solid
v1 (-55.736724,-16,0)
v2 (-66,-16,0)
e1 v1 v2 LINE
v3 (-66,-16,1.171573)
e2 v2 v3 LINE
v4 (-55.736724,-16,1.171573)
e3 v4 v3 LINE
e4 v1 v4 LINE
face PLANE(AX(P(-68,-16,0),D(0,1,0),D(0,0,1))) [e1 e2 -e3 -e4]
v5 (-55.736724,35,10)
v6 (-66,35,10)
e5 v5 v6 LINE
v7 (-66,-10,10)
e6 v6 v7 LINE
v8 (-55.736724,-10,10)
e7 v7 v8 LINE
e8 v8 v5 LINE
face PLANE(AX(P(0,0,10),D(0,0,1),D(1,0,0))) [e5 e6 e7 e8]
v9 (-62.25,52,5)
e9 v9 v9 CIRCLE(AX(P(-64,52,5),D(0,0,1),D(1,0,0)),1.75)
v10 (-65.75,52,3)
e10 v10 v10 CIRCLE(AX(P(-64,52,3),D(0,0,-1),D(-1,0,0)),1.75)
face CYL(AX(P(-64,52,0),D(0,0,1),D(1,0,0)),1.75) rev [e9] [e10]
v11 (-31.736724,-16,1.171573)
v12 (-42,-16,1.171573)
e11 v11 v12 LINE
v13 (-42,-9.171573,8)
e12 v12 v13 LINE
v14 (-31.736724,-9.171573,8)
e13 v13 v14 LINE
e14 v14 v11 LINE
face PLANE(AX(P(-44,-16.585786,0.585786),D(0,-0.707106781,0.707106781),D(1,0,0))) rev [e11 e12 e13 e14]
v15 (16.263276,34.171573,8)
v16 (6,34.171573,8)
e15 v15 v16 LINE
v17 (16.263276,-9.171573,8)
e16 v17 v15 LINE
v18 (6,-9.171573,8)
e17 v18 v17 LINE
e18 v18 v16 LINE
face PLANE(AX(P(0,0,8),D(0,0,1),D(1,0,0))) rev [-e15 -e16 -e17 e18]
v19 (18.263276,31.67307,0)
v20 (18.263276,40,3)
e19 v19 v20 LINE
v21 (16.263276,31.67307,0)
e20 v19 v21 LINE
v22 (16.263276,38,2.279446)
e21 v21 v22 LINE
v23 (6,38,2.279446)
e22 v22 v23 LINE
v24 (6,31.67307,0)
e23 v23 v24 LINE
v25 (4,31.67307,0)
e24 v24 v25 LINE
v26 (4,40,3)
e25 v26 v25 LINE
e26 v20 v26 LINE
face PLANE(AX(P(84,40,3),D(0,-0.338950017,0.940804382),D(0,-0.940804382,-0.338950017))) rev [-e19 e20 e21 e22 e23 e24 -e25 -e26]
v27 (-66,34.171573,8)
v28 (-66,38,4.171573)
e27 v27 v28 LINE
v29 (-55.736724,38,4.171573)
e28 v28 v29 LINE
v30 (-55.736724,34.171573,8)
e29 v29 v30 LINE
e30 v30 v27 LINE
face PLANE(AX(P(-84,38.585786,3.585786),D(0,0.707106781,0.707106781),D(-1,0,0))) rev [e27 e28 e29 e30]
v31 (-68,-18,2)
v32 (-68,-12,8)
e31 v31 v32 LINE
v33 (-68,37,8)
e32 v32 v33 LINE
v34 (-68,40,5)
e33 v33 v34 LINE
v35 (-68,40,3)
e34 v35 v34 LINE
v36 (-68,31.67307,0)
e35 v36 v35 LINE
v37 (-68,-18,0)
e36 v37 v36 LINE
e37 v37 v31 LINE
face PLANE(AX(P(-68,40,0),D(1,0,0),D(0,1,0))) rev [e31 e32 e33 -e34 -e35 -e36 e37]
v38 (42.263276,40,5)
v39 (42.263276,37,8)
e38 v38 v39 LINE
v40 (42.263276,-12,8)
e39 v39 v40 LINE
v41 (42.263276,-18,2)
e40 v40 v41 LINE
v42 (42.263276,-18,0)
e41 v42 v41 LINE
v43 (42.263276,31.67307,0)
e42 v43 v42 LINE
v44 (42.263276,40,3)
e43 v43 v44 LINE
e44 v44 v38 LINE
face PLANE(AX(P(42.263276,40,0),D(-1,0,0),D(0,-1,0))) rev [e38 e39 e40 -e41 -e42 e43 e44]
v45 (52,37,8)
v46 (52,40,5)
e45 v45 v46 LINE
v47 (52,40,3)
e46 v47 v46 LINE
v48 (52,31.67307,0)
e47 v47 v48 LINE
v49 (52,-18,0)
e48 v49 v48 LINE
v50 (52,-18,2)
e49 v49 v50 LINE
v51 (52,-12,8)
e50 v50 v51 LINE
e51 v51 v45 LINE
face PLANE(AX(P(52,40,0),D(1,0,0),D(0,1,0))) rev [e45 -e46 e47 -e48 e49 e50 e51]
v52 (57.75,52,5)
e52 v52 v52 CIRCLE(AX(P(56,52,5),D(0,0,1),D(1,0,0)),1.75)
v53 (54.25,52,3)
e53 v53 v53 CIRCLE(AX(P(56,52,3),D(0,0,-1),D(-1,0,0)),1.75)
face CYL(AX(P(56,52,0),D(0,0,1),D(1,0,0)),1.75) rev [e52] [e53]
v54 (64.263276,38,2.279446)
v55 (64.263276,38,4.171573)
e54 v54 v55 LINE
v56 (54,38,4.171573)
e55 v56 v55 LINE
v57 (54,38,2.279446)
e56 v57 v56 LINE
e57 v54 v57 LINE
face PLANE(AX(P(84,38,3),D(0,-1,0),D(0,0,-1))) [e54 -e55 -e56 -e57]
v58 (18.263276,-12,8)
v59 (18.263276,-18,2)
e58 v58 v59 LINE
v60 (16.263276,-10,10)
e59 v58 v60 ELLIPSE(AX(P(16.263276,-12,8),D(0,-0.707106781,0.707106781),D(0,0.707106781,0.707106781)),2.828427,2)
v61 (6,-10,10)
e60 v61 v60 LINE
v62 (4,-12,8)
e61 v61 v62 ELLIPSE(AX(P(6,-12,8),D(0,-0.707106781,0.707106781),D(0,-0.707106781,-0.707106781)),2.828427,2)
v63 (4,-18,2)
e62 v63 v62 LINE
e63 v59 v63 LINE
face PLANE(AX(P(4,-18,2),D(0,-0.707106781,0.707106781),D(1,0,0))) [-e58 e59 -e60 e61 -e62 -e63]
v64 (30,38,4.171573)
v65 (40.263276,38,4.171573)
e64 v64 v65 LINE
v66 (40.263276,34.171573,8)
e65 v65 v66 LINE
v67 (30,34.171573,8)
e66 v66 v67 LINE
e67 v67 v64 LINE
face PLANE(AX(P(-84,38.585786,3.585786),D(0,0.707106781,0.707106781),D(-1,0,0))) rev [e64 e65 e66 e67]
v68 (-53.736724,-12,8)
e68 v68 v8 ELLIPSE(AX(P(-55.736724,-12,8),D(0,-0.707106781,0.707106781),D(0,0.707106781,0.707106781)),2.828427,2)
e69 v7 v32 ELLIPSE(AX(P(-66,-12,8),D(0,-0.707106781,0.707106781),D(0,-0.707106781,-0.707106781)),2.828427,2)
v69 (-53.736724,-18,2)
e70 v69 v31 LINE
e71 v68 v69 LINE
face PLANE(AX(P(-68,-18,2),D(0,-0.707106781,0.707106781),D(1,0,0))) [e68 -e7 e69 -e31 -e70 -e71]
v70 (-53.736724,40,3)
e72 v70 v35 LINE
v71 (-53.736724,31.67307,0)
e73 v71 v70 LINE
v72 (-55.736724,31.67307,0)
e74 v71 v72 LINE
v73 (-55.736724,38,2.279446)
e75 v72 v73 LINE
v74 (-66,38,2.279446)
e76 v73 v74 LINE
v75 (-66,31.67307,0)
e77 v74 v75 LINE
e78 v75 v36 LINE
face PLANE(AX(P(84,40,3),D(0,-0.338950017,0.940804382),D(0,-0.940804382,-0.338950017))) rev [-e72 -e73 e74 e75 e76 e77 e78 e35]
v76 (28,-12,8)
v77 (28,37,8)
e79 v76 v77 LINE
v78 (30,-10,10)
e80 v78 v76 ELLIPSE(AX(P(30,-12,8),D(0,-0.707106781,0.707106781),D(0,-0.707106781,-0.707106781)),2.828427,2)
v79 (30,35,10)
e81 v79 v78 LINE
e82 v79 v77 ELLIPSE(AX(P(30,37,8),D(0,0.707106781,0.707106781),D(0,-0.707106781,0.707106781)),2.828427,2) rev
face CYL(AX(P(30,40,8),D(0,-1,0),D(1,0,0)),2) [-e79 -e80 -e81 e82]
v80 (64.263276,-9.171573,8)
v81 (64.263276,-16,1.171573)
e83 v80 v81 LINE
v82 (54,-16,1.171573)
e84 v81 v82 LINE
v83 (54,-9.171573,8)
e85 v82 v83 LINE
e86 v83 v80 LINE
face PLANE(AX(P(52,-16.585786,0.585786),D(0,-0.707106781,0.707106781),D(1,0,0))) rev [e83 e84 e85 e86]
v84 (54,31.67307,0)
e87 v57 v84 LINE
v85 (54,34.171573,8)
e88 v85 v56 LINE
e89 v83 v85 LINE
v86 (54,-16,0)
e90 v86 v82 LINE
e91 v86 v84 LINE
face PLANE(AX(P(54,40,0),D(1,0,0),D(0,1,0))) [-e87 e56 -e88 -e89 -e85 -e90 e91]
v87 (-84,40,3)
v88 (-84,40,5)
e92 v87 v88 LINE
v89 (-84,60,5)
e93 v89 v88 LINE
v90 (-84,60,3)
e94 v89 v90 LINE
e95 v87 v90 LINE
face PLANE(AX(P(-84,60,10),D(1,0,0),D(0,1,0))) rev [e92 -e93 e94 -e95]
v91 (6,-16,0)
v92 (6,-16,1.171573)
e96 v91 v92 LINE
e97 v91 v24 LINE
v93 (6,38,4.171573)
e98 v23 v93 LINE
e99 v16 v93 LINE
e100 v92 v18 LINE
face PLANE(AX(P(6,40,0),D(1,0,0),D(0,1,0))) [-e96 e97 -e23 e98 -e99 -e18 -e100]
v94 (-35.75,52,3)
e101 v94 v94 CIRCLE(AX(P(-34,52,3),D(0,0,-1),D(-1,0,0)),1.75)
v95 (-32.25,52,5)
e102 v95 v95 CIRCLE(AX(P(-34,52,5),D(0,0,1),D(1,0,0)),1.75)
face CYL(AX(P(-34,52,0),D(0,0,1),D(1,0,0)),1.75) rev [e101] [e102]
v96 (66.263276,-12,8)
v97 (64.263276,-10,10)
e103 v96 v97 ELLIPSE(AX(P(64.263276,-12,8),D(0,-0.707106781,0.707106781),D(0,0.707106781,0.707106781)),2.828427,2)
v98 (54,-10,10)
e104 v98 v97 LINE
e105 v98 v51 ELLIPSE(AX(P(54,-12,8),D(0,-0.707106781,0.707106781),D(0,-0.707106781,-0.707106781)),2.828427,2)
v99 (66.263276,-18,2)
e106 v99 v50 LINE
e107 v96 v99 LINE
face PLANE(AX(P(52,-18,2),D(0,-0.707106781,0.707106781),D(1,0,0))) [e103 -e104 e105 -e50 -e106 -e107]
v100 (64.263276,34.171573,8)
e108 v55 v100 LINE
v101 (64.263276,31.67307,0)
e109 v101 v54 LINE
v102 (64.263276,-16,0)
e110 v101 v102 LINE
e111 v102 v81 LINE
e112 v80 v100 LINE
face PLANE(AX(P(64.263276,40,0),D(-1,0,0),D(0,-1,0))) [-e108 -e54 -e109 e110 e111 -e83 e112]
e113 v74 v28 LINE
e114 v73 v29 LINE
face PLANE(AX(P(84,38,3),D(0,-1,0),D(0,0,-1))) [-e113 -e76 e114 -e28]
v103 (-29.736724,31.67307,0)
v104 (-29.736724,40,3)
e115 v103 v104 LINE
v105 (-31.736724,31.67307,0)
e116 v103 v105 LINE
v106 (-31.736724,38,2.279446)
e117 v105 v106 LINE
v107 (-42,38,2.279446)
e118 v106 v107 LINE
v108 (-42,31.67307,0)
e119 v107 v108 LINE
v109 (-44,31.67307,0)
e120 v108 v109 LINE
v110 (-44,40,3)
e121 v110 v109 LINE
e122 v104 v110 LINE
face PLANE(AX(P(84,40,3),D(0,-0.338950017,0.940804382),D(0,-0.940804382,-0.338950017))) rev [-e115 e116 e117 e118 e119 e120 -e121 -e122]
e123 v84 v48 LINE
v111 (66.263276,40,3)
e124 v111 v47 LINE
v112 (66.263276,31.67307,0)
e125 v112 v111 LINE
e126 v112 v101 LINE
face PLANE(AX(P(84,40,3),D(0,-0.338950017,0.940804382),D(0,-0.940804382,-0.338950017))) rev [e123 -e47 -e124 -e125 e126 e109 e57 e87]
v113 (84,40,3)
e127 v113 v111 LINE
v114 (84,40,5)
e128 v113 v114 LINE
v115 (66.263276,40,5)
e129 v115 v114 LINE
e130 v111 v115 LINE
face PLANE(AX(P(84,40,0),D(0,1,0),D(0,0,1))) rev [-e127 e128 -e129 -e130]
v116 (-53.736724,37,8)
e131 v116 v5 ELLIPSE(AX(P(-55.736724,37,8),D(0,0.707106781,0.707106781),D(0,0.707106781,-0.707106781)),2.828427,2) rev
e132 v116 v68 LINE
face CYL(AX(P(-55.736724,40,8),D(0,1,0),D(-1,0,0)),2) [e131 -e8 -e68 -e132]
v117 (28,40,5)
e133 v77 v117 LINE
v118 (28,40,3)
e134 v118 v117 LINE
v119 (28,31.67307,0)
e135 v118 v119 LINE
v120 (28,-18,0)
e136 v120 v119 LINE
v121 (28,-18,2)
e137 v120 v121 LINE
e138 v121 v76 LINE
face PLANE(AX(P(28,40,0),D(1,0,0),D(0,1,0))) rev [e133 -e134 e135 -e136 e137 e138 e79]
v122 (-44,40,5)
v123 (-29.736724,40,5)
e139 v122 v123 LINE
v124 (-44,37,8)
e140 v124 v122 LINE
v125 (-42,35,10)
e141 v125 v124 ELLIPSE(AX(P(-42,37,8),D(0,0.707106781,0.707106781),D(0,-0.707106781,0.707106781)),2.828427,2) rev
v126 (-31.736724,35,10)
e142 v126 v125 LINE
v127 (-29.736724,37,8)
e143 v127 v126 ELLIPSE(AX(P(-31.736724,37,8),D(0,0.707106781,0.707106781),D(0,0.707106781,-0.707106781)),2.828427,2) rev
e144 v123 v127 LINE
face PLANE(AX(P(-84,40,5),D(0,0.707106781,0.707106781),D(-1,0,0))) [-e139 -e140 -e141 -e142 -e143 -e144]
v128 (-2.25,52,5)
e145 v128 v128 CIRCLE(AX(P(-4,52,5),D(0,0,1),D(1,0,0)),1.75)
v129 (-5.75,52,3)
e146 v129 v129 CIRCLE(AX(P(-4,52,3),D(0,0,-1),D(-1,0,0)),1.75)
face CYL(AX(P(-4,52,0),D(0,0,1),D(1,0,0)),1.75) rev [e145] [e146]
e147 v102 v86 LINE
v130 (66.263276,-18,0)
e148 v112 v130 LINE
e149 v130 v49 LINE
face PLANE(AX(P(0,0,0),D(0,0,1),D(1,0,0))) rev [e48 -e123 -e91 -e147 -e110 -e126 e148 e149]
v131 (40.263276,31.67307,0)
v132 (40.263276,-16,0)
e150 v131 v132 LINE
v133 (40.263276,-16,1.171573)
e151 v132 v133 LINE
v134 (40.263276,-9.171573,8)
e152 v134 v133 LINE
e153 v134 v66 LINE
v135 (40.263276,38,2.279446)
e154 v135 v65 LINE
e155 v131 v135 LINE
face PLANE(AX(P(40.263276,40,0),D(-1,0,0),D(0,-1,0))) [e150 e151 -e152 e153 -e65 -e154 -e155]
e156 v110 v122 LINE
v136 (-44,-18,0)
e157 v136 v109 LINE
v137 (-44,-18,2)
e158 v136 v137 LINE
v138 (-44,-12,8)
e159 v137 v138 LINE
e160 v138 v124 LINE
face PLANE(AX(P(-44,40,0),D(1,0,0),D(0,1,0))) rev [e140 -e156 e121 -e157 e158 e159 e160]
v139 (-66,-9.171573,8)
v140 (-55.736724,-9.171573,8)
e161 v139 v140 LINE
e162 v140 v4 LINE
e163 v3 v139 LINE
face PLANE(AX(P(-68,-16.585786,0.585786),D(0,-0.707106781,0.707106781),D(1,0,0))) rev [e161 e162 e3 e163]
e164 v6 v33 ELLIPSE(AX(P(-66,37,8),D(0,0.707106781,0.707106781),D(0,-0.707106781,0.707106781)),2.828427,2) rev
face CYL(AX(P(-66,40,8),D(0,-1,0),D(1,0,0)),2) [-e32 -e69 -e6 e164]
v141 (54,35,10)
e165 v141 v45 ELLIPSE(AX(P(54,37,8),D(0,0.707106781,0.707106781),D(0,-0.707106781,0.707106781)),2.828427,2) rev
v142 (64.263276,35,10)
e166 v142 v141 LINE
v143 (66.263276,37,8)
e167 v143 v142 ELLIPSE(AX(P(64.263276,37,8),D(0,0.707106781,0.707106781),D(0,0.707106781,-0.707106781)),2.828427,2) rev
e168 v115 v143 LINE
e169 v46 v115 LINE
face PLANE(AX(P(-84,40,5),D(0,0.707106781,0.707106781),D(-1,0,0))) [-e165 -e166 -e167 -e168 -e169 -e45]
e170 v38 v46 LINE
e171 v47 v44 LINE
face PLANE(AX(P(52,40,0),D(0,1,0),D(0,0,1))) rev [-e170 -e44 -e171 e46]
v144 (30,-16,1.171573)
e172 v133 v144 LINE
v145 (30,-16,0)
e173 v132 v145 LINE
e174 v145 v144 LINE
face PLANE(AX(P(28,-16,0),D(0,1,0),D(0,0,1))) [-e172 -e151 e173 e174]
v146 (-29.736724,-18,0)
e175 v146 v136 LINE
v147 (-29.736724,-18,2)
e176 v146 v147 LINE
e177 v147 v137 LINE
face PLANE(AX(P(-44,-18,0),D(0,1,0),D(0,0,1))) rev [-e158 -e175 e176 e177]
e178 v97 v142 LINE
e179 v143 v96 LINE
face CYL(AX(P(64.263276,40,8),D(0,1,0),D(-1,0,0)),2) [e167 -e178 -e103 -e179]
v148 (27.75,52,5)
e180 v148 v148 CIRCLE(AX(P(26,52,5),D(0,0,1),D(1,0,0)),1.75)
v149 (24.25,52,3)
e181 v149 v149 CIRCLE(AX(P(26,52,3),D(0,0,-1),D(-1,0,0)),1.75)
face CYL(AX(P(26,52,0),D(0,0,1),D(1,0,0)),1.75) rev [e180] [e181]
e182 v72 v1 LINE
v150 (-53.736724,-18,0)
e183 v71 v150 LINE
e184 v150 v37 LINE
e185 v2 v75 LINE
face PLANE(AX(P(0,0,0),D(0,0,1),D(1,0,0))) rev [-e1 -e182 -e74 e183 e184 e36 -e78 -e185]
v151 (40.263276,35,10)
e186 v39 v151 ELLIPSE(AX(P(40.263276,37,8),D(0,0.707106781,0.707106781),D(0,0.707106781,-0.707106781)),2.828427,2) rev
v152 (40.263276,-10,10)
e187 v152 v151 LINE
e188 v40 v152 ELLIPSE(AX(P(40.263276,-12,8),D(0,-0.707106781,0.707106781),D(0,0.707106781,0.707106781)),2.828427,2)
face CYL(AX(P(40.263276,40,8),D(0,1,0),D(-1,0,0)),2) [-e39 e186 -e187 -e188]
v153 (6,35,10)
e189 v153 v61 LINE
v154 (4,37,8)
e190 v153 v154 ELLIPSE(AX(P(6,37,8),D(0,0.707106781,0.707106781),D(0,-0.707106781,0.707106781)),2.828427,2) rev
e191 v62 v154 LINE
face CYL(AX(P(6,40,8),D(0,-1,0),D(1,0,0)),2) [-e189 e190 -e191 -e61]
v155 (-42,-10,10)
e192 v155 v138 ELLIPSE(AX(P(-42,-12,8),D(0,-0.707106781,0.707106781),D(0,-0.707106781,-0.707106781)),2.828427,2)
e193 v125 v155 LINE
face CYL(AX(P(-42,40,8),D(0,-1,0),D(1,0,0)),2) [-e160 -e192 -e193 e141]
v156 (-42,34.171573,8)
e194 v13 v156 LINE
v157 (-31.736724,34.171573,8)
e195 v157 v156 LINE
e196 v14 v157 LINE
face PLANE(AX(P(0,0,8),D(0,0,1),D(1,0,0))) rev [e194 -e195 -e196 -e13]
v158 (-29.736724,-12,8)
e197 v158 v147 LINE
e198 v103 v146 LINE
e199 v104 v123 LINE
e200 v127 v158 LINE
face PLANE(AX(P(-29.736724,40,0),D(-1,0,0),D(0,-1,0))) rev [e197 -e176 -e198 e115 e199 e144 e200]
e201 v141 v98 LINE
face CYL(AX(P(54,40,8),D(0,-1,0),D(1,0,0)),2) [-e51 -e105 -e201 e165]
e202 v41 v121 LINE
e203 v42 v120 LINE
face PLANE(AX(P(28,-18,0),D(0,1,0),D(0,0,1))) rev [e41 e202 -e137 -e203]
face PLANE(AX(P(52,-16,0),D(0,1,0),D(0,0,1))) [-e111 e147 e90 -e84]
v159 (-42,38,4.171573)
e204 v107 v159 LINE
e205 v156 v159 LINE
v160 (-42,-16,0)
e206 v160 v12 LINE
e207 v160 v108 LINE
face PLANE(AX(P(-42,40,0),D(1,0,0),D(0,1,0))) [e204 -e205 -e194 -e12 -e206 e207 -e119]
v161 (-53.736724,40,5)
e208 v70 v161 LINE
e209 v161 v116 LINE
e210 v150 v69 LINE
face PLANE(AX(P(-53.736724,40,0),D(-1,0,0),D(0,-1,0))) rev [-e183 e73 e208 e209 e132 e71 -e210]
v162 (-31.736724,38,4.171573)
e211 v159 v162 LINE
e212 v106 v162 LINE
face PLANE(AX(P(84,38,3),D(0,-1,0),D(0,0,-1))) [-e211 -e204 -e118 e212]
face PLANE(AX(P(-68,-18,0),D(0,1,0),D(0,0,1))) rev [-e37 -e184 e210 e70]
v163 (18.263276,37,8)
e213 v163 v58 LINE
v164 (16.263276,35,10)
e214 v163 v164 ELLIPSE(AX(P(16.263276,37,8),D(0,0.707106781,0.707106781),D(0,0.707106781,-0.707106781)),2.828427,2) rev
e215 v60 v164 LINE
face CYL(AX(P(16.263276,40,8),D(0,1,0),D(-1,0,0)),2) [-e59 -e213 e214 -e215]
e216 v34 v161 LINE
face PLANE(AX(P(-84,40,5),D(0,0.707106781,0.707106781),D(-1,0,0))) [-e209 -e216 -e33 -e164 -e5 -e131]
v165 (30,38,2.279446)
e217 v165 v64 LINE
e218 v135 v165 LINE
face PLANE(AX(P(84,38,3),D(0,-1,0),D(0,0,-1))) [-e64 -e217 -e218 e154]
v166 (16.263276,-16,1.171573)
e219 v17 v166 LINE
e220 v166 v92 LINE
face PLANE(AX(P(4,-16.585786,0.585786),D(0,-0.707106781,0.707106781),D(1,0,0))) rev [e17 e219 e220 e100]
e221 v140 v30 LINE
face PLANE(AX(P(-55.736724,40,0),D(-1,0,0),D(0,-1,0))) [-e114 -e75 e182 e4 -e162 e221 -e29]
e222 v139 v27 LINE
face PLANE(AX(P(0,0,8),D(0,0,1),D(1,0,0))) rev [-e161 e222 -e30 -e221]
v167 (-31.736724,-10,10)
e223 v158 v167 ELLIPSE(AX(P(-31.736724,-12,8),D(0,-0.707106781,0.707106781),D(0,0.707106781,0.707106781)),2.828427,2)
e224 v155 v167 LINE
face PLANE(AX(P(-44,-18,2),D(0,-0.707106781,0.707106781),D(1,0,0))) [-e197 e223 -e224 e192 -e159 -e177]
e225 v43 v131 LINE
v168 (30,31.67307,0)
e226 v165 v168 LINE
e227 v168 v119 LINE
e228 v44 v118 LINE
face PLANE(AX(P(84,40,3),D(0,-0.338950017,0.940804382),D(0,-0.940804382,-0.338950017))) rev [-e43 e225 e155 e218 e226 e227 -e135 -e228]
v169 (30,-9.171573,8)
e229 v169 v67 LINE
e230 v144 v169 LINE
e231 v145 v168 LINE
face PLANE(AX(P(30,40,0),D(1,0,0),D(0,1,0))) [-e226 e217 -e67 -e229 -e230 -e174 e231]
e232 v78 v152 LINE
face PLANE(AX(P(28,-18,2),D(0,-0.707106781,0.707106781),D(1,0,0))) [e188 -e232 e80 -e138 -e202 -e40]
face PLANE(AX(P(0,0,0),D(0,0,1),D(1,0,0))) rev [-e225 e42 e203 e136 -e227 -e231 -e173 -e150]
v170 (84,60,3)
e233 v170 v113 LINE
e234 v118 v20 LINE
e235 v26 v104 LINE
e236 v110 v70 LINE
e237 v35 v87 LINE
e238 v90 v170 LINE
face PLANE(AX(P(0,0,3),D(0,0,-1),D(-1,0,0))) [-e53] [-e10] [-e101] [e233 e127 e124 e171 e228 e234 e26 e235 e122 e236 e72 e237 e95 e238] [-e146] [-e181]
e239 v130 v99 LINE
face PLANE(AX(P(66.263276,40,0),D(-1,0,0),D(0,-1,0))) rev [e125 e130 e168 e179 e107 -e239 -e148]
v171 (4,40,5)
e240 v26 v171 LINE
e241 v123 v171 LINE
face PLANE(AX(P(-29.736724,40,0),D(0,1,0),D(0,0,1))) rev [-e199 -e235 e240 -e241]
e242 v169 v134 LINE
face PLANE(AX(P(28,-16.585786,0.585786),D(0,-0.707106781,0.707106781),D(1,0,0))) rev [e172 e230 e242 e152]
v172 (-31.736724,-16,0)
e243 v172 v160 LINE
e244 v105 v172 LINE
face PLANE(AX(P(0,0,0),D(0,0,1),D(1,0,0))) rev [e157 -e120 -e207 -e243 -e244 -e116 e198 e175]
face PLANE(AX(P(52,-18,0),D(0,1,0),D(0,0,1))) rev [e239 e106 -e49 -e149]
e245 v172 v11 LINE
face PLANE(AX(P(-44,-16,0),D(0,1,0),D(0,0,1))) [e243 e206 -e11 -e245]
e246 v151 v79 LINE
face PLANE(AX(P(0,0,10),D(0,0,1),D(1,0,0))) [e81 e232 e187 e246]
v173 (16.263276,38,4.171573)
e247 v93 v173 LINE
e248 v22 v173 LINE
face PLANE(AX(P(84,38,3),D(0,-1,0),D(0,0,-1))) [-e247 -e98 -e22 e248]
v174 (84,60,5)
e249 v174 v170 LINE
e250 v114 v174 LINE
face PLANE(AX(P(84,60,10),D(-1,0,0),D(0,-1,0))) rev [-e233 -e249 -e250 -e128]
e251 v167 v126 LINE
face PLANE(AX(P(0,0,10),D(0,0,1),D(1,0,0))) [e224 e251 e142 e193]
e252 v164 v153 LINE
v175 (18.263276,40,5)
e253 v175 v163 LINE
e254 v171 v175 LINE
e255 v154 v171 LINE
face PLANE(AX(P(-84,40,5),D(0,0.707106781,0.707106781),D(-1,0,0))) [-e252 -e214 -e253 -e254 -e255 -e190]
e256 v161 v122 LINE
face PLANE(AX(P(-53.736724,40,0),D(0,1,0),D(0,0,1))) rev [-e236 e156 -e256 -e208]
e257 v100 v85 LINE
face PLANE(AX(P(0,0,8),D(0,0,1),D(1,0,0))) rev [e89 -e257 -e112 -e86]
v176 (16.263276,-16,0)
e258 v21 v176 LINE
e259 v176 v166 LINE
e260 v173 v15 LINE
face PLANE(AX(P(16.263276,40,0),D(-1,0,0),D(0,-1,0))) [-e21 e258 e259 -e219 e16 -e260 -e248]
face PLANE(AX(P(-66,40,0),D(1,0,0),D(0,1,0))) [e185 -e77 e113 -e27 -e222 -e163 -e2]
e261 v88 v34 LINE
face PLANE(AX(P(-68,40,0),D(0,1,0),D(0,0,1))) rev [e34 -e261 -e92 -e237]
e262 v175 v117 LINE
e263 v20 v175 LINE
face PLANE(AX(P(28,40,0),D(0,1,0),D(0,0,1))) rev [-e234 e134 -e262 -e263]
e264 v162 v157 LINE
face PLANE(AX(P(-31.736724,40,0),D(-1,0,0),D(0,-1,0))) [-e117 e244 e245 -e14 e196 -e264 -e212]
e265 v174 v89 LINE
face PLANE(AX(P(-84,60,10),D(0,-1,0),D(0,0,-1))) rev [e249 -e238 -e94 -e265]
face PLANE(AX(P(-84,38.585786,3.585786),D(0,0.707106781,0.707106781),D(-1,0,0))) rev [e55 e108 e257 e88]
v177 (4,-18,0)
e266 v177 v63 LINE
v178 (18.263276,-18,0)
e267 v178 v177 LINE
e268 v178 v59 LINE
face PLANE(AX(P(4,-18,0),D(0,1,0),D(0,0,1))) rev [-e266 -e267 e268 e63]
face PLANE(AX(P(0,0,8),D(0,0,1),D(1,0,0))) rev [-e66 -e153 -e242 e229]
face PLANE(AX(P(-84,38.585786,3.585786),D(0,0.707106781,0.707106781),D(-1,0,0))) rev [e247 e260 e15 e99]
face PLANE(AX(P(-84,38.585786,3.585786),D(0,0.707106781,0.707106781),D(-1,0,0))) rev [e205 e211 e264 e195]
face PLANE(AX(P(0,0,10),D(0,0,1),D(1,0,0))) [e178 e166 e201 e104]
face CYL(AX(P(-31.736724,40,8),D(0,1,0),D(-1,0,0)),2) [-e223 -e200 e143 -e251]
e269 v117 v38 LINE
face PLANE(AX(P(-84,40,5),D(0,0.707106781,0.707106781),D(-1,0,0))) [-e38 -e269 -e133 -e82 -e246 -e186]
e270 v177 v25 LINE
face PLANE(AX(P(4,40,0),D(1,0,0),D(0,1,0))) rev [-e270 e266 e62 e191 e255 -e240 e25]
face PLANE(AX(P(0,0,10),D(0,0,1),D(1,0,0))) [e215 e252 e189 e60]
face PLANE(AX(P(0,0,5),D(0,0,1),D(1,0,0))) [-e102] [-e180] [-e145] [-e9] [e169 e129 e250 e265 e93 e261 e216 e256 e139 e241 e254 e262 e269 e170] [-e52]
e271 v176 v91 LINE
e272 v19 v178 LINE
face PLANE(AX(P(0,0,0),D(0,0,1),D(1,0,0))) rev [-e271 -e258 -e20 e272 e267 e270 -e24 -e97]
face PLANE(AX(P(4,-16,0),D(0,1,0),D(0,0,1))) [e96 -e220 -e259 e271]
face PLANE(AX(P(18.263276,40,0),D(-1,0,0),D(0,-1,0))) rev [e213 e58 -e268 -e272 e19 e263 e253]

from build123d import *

# Parameters (mm, degrees)
SKETCH1_W           = 168
SKETCH1_H           = 120
BOSS_EXTRUDE1_DEPTH = 10
CUT_EXTRUDE1_DEPTH  = 104.7111373
CHAMFER1_SIZE       = 8
FILLET1_R           = 2
SKETCH3_W           = 168
SKETCH3_H           = 20
CUT_EXTRUDE2_DEPTH  = 5
SKETCH4_W           = 168
SKETCH4_H           = 20
CUT_EXTRUDE3_DEPTH  = 3
CHAMFER2_SIZE       = 5
SHELL1_START        = -66
SHELL1_DEPTH        = 10.263276069
SHELL1_START_2      = -42
SHELL1_2_DEPTH      = 10.263276069
SHELL1_START_3      = 6
SHELL1_3_DEPTH      = 10.263276069
SHELL1_START_4      = 30
SHELL1_4_DEPTH      = 10.263276069
SHELL1_START_5      = 54
SHELL1_5_DEPTH      = 10.263276069
CUT_EXTRUDE4_DEPTH  = 164.719271926
SKETCH6_R           = 1.75
CUT_EXTRUDE5_DEPTH  = 104.348923555


# Read off the part's stored shape, not the designer's step: Shell1
with BuildPart() as part:
    # Sketch1 → Boss-Extrude1 (new body)
    with BuildSketch(Plane.XY):
        Rectangle(SKETCH1_W, SKETCH1_H)
    extrude(amount=BOSS_EXTRUDE1_DEPTH)

    # Sketch2 → Cut-Extrude1 (cut, through all)
    with BuildSketch(Plane.XY.offset(10)):
        Polygon((-68, 40), (-68, -18), (-53.736723931, -18), (-53.736723931, 40), (-44, 40), (-44, -18), (-29.736723931, -18), (-29.736723931, 40), (4, 40), (4, -18), (18.263276069, -18), (18.263276069, 40), (28, 40), (28, -18), (42.263276069, -18), (42.263276069, 40), (52, 40), (52, -18), (66.263276069, -18), (66.263276069, 40), (84, 40), (84, -60), (-84, -60), (-84, 40), align=None)
    extrude(amount=-CUT_EXTRUDE1_DEPTH, mode=Mode.SUBTRACT)

    # Chamfer1
    chamfer1_edges = [part.edges().sort_by_distance(p)[0] for p in [
        (59.131638035, -18, 10),
        (35.131638035, -18, 10),
        (11.131638035, -18, 10),
        (-36.868361965, -18, 10),
        (-60.868361965, -18, 10),
    ]]
    chamfer(chamfer1_edges, length=CHAMFER1_SIZE)

    # Fillet1
    fillet1_edges = [part.edges().sort_by_distance(p)[0] for p in [
        (66.263276069, 15, 10),
        (42.263276069, 15, 10),
        (18.263276069, 15, 10),
        (-29.736723931, 15, 10),
        (-53.736723931, 15, 10),
        (52, 15, 10),
        (-68, 15, 10),
        (-44, 15, 10),
        (4, 15, 10),
        (28, 15, 10),
    ]]
    fillet(fillet1_edges, radius=FILLET1_R)

    # Sketch3 → Cut-Extrude2 (cut)
    with BuildSketch(Plane.XY.offset(10)):
        with Locations((0, 50)):
            Rectangle(SKETCH3_W, SKETCH3_H)
    extrude(amount=-CUT_EXTRUDE2_DEPTH, mode=Mode.SUBTRACT)

    # Sketch4 → Cut-Extrude3 (cut)
    with BuildSketch(Plane(origin=(0, 0, 0), x_dir=(-1, 0, 0), z_dir=(0, 0, -1))):
        with Locations((0, 50)):
            Rectangle(SKETCH4_W, SKETCH4_H)
    extrude(amount=-CUT_EXTRUDE3_DEPTH, mode=Mode.SUBTRACT)

    # Chamfer2
    # the kernel refuses this chamfer: 5 mm, written as the material it takes off along each edge
    with BuildSketch(Plane(origin=(77.121691009, 40, 10), x_dir=(0, 0.027495876610586317, -0.9996219169112968), z_dir=(-1, 0, 0)), Plane(origin=(53.121691009, 40, 10), x_dir=(0, 0.027495876610586317, -0.9996219169112968), z_dir=(-1, 0, 0)), Plane(origin=(29.121691009, 40, 10), x_dir=(0, 0.027495876610586317, -0.9996219169112968), z_dir=(-1, 0, 0)), Plane(origin=(-18.878308991, 40, 10), x_dir=(0, 0.027495876610586317, -0.9996219169112968), z_dir=(-1, 0, 0))) as chamfer2_piece_1:
        Polygon((CHAMFER2_SIZE * 0.999621916911, CHAMFER2_SIZE * 0.0274958766106), (-CHAMFER2_SIZE * 0.0274958766106, CHAMFER2_SIZE * 0.999621916911), (0, 0), align=None)
    extrude(amount=35.980105949, mode=Mode.SUBTRACT)
    with BuildSketch(Plane(origin=(-42.878308991, 40, 10), x_dir=(0, -0.9996219169112968, 0.027495876610586317), z_dir=(-1, 0, 0))) as chamfer2_piece_2:
        Polygon((CHAMFER2_SIZE * 0.999621916911, -CHAMFER2_SIZE * 0.0274958766106), (-CHAMFER2_SIZE * 0.0274958766106, -CHAMFER2_SIZE * 0.999621916911), (0, 0), align=None)
    extrude(amount=35.980105949, mode=Mode.SUBTRACT)

    # Shell1 outline → Shell1 (cut)
    with BuildSketch(Plane.YZ.offset(SHELL1_START)):
        Polygon((38, 4.171572875), (34.171572875, 8), (-9.171572875, 8), (-16, 1.171572875), (-16, 0), (38, 0), align=None)
    extrude(amount=SHELL1_DEPTH, mode=Mode.SUBTRACT)

    # Shell1 2 outline → Shell1 2 (cut)
    with BuildSketch(Plane.YZ.offset(SHELL1_START_2)):
        Polygon((38, 4.171572875), (34.171572875, 8), (-9.171572875, 8), (-16, 1.171572875), (-16, 0), (38, 0), align=None)
    extrude(amount=SHELL1_2_DEPTH, mode=Mode.SUBTRACT)

    # Shell1 3 outline → Shell1 3 (cut)
    with BuildSketch(Plane.YZ.offset(SHELL1_START_3)):
        Polygon((38, 4.171572875), (34.171572875, 8), (-9.171572875, 8), (-16, 1.171572875), (-16, 0), (38, 0), align=None)
    extrude(amount=SHELL1_3_DEPTH, mode=Mode.SUBTRACT)

    # Shell1 4 outline → Shell1 4 (cut)
    with BuildSketch(Plane.YZ.offset(SHELL1_START_4)):
        Polygon((38, 4.171572875), (34.171572875, 8), (-9.171572875, 8), (-16, 1.171572875), (-16, 0), (38, 0), align=None)
    extrude(amount=SHELL1_4_DEPTH, mode=Mode.SUBTRACT)

    # Shell1 5 outline → Shell1 5 (cut)
    with BuildSketch(Plane.YZ.offset(SHELL1_START_5)):
        Polygon((38, 4.171572875), (34.171572875, 8), (-9.171572875, 8), (-16, 1.171572875), (-16, 0), (38, 0), align=None)
    extrude(amount=SHELL1_5_DEPTH, mode=Mode.SUBTRACT)

    # Sketch5 → Cut-Extrude4 (cut, through all)
    with BuildSketch(Plane.ZY.offset(68)):
        Polygon((3, 40), (0, 31.673069766), (0, 40), align=None)
    extrude(amount=-CUT_EXTRUDE4_DEPTH, mode=Mode.SUBTRACT)

    # Sketch6 → Cut-Extrude5 (cut, through all)
    with BuildSketch(Plane.XY.offset(5)):
        with Locations((-64, 52)):
            Circle(SKETCH6_R)
        with Locations((-34, 52)):
            Circle(SKETCH6_R)
        with Locations((-4, 52)):
            Circle(SKETCH6_R)
        with Locations((26, 52)):
            Circle(SKETCH6_R)
        with Locations((56, 52)):
            Circle(SKETCH6_R)
    extrude(amount=-CUT_EXTRUDE5_DEPTH, mode=Mode.SUBTRACT)


solid = part.part
